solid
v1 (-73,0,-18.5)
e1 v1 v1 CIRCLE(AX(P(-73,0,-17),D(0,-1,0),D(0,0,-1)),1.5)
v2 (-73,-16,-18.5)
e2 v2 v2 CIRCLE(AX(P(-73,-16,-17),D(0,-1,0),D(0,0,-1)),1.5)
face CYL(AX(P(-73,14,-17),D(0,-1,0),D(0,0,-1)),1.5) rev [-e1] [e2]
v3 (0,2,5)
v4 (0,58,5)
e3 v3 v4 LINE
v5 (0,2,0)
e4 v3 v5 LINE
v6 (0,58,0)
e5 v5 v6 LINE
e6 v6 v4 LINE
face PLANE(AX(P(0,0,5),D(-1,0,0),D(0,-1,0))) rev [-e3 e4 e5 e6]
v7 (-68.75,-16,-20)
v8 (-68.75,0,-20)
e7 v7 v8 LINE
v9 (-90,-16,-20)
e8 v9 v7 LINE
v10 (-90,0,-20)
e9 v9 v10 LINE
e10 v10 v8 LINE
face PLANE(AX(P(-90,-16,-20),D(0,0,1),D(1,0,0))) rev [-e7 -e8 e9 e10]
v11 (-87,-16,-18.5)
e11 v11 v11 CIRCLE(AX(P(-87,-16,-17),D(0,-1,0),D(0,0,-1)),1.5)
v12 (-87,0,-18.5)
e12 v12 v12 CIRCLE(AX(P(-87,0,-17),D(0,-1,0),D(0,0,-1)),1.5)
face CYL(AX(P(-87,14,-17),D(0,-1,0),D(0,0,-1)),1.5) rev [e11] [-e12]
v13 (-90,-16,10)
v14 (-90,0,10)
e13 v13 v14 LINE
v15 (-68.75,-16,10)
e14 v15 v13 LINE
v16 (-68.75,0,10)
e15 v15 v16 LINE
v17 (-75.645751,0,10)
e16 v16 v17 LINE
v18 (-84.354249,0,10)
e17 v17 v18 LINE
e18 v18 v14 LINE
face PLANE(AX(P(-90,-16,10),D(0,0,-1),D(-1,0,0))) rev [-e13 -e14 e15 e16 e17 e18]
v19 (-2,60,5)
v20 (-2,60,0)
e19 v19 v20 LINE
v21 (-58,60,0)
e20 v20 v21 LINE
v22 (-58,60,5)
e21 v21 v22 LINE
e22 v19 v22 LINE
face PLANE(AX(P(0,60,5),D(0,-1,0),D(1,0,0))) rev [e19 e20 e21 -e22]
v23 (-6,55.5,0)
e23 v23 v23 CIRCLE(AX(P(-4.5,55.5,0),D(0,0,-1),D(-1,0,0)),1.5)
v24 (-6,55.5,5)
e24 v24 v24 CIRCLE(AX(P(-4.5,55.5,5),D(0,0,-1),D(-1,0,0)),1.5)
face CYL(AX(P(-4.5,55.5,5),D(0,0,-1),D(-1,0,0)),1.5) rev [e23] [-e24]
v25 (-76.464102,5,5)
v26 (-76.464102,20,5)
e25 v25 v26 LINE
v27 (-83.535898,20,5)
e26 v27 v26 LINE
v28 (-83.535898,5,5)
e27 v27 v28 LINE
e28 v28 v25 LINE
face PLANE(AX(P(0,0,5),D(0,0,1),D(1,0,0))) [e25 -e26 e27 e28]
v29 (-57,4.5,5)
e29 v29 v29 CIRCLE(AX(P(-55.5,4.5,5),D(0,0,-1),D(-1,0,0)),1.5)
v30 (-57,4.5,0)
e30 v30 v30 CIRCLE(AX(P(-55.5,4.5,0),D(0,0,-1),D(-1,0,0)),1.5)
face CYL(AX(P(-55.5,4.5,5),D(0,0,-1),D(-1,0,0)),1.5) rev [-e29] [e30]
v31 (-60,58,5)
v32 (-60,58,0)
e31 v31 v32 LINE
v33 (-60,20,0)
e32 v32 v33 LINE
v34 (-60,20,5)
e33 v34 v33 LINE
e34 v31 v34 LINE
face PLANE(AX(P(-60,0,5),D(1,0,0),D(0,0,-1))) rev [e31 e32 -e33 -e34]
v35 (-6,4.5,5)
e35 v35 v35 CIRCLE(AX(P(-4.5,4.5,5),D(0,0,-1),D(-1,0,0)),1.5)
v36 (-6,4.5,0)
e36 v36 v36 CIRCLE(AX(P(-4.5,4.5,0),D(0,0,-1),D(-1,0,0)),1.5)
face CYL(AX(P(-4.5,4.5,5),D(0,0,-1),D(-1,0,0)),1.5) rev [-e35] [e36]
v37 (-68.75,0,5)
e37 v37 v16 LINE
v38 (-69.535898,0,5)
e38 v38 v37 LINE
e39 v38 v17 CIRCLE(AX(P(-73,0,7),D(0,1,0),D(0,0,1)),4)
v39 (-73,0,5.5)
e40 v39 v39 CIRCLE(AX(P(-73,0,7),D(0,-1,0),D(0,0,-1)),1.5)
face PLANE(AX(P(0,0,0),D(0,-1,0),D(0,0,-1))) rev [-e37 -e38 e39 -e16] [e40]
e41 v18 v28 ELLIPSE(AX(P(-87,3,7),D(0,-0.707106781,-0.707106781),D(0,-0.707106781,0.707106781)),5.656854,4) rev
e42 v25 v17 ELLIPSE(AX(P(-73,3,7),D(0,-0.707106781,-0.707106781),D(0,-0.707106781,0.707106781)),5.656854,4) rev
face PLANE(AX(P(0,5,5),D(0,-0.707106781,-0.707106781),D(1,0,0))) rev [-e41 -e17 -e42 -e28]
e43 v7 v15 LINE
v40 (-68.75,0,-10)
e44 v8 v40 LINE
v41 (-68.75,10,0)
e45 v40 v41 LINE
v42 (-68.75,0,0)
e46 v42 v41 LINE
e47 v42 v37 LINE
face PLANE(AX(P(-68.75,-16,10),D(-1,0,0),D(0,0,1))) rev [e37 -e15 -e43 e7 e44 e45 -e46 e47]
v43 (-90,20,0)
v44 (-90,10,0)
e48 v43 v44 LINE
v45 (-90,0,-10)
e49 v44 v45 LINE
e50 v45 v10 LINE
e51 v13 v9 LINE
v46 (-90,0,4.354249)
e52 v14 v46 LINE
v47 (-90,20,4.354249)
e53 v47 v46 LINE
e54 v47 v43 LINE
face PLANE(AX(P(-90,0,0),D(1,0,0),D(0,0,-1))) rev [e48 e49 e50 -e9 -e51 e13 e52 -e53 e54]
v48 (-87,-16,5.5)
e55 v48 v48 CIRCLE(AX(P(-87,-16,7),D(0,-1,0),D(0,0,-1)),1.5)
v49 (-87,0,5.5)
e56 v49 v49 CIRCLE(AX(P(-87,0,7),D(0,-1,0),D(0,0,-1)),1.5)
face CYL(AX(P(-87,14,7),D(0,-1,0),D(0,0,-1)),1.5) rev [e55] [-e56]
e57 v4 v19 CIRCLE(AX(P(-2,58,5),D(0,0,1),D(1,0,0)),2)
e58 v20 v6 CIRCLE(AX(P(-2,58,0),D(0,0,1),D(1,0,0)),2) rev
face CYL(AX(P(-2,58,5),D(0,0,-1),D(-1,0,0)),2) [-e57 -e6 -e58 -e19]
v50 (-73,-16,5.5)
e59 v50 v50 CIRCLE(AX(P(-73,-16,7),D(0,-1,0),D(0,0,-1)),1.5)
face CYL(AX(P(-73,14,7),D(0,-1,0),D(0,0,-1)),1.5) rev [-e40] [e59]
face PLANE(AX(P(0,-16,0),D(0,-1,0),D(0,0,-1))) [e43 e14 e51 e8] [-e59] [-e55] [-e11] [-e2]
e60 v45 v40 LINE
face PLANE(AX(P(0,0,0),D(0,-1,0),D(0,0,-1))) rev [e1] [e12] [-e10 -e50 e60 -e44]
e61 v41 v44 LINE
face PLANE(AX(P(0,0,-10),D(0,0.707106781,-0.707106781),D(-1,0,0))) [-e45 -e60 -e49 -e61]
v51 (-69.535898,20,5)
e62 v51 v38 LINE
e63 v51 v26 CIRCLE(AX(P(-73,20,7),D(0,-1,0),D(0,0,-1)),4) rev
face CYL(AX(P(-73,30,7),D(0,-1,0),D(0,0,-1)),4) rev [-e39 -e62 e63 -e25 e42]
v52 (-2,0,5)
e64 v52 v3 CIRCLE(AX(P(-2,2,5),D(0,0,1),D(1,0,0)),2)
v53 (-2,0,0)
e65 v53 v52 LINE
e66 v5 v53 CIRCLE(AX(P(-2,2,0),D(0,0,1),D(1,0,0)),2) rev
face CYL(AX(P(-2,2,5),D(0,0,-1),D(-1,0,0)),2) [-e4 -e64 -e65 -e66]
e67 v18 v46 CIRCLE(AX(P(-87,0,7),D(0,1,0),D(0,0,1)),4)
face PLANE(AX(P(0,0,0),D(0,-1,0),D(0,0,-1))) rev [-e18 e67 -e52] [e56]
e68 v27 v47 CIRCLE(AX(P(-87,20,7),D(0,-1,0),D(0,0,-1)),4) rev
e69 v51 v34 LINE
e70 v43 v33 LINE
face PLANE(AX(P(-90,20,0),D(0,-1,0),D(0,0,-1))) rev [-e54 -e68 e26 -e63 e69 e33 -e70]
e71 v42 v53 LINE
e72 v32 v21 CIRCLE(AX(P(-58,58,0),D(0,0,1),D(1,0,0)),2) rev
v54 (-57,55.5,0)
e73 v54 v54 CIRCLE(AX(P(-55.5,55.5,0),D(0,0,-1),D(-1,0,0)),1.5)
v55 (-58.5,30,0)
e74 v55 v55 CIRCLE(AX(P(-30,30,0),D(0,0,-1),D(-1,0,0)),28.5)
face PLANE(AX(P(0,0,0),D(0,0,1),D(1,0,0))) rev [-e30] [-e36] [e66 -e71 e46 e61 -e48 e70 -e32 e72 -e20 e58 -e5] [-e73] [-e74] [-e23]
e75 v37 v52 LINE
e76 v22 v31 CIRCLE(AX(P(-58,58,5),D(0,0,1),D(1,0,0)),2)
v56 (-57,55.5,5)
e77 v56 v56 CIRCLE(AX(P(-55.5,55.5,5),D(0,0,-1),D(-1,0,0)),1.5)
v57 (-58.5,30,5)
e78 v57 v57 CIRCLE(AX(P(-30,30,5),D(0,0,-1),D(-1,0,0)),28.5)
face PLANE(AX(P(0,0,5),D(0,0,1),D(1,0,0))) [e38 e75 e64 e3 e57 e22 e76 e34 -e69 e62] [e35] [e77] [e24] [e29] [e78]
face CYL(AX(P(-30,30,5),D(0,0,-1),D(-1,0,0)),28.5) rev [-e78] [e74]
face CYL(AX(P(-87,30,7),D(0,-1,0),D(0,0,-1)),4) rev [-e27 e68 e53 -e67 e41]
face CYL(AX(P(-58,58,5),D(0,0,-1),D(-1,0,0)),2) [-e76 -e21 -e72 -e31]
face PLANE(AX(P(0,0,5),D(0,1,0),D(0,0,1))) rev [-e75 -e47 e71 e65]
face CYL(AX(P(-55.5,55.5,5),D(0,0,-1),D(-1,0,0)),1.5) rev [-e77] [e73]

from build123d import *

# Parameters (mm, degrees)
SKETCH_1_W          = 60
SKETCH_1_H          = 60
EXTRUDE_1_DEPTH     = 5
SKETCH_2_R          = 1.5
CUT_EXTRUDE_1_DEPTH = 5
SKETCH_3_R          = 28.5
CUT_EXTRUDE_2_DEPTH = 5
SKETCH_4_W          = 5
SKETCH_4_H          = 20
EXTRUDE_2_DEPTH     = 30
SKETCH_5_W          = 21.25
SKETCH_5_H          = 30
EXTRUDE_3_DEPTH     = 16
SKETCH_6_R          = 1.5
CUT_EXTRUDE_3_DEPTH = 30
SKETCH_7_R          = 4
CUT_EXTRUDE_4_DEPTH = 30
CHAMFER_1_SIZE      = 10
CHAMFER_2_SIZE      = 5
FILLET_1_R          = 2


with BuildPart() as part:
    # 草图1 → 凸台-拉伸1 (new body)
    with BuildSketch(Plane.XY):
        with Locations((-30, 30)):
            Rectangle(SKETCH_1_W, SKETCH_1_H)
    extrude(amount=EXTRUDE_1_DEPTH)

    # 草图2 → 切除-拉伸1 (cut)
    with BuildSketch(Plane(origin=(0, 0, 0), x_dir=(-1, 0, 0), z_dir=(0, 0, -1))):
        with Locations((4.5, 55.5)):
            Circle(SKETCH_2_R)
        with Locations((55.5, 55.5)):
            Circle(SKETCH_2_R)
        with Locations((4.5, 4.5)):
            Circle(SKETCH_2_R)
        with Locations((55.5, 4.5)):
            Circle(SKETCH_2_R)
    extrude(amount=-CUT_EXTRUDE_1_DEPTH, mode=Mode.SUBTRACT)

    # 草图3 → 切除-拉伸2 (cut)
    with BuildSketch(Plane(origin=(0, 0, 0), x_dir=(-1, 0, 0), z_dir=(0, 0, -1))):
        with Locations((30, 30)):
            Circle(SKETCH_3_R)
    extrude(amount=-CUT_EXTRUDE_2_DEPTH, mode=Mode.SUBTRACT)

    # 草图4 → 凸台-拉伸2 (add)
    with BuildSketch(Plane.ZY.offset(60)):
        with Locations((2.5, 10)):
            Rectangle(SKETCH_4_W, SKETCH_4_H)
    extrude(amount=EXTRUDE_2_DEPTH)

    # 草图5 → 凸台-拉伸3 (add)
    with BuildSketch(Plane.XZ):
        with Locations((-79.375, -5)):
            Rectangle(SKETCH_5_W, SKETCH_5_H)
    extrude(amount=EXTRUDE_3_DEPTH)

    # 草图6 → 切除-拉伸3 (cut)
    with BuildSketch(Plane.XZ.offset(16)):
        with Locations(Location((-87, 7, 0), (0, 0, 270))):
            Circle(SKETCH_6_R)
        with Locations(Location((-73, 7, 0), (0, 0, 270))):
            Circle(SKETCH_6_R)
        with Locations(Location((-87, -17, 0), (0, 0, 270))):
            Circle(SKETCH_6_R)
        with Locations(Location((-73, -17, 0), (0, 0, 270))):
            Circle(SKETCH_6_R)
    extrude(amount=-CUT_EXTRUDE_3_DEPTH, mode=Mode.SUBTRACT)

    # 草图7 → 切除-拉伸4 (cut)
    with BuildSketch(Plane(origin=(0, 0, 0), x_dir=(1, 0, 0), z_dir=(0, 1, 0))):
        with Locations((-87, -7)):
            Circle(SKETCH_7_R)
        with Locations((-73, -7)):
            Circle(SKETCH_7_R)
    extrude(amount=CUT_EXTRUDE_4_DEPTH, mode=Mode.SUBTRACT)

    # 倒角1
    chamfer_1_edges = [part.edges().sort_by_distance(p)[0] for p in [
        (-79.375, 0, 0),
    ]]
    chamfer(chamfer_1_edges, length=CHAMFER_1_SIZE)

    # 倒角2
    chamfer_2_edges = [part.edges().sort_by_distance(p)[0] for p in [
        (-80, 0, 5),
    ]]
    chamfer(chamfer_2_edges, length=CHAMFER_2_SIZE - 0.0001)  # a hair under: the kernel refuses the full size

    # 圆角1
    fillet_1_edges = [part.edges().sort_by_distance(p)[0] for p in [
        (0, 0, 2.5),
        (-60, 60, 2.5),
        (0, 60, 2.5),
    ]]
    fillet(fillet_1_edges, radius=FILLET_1_R)


solid = part.part
